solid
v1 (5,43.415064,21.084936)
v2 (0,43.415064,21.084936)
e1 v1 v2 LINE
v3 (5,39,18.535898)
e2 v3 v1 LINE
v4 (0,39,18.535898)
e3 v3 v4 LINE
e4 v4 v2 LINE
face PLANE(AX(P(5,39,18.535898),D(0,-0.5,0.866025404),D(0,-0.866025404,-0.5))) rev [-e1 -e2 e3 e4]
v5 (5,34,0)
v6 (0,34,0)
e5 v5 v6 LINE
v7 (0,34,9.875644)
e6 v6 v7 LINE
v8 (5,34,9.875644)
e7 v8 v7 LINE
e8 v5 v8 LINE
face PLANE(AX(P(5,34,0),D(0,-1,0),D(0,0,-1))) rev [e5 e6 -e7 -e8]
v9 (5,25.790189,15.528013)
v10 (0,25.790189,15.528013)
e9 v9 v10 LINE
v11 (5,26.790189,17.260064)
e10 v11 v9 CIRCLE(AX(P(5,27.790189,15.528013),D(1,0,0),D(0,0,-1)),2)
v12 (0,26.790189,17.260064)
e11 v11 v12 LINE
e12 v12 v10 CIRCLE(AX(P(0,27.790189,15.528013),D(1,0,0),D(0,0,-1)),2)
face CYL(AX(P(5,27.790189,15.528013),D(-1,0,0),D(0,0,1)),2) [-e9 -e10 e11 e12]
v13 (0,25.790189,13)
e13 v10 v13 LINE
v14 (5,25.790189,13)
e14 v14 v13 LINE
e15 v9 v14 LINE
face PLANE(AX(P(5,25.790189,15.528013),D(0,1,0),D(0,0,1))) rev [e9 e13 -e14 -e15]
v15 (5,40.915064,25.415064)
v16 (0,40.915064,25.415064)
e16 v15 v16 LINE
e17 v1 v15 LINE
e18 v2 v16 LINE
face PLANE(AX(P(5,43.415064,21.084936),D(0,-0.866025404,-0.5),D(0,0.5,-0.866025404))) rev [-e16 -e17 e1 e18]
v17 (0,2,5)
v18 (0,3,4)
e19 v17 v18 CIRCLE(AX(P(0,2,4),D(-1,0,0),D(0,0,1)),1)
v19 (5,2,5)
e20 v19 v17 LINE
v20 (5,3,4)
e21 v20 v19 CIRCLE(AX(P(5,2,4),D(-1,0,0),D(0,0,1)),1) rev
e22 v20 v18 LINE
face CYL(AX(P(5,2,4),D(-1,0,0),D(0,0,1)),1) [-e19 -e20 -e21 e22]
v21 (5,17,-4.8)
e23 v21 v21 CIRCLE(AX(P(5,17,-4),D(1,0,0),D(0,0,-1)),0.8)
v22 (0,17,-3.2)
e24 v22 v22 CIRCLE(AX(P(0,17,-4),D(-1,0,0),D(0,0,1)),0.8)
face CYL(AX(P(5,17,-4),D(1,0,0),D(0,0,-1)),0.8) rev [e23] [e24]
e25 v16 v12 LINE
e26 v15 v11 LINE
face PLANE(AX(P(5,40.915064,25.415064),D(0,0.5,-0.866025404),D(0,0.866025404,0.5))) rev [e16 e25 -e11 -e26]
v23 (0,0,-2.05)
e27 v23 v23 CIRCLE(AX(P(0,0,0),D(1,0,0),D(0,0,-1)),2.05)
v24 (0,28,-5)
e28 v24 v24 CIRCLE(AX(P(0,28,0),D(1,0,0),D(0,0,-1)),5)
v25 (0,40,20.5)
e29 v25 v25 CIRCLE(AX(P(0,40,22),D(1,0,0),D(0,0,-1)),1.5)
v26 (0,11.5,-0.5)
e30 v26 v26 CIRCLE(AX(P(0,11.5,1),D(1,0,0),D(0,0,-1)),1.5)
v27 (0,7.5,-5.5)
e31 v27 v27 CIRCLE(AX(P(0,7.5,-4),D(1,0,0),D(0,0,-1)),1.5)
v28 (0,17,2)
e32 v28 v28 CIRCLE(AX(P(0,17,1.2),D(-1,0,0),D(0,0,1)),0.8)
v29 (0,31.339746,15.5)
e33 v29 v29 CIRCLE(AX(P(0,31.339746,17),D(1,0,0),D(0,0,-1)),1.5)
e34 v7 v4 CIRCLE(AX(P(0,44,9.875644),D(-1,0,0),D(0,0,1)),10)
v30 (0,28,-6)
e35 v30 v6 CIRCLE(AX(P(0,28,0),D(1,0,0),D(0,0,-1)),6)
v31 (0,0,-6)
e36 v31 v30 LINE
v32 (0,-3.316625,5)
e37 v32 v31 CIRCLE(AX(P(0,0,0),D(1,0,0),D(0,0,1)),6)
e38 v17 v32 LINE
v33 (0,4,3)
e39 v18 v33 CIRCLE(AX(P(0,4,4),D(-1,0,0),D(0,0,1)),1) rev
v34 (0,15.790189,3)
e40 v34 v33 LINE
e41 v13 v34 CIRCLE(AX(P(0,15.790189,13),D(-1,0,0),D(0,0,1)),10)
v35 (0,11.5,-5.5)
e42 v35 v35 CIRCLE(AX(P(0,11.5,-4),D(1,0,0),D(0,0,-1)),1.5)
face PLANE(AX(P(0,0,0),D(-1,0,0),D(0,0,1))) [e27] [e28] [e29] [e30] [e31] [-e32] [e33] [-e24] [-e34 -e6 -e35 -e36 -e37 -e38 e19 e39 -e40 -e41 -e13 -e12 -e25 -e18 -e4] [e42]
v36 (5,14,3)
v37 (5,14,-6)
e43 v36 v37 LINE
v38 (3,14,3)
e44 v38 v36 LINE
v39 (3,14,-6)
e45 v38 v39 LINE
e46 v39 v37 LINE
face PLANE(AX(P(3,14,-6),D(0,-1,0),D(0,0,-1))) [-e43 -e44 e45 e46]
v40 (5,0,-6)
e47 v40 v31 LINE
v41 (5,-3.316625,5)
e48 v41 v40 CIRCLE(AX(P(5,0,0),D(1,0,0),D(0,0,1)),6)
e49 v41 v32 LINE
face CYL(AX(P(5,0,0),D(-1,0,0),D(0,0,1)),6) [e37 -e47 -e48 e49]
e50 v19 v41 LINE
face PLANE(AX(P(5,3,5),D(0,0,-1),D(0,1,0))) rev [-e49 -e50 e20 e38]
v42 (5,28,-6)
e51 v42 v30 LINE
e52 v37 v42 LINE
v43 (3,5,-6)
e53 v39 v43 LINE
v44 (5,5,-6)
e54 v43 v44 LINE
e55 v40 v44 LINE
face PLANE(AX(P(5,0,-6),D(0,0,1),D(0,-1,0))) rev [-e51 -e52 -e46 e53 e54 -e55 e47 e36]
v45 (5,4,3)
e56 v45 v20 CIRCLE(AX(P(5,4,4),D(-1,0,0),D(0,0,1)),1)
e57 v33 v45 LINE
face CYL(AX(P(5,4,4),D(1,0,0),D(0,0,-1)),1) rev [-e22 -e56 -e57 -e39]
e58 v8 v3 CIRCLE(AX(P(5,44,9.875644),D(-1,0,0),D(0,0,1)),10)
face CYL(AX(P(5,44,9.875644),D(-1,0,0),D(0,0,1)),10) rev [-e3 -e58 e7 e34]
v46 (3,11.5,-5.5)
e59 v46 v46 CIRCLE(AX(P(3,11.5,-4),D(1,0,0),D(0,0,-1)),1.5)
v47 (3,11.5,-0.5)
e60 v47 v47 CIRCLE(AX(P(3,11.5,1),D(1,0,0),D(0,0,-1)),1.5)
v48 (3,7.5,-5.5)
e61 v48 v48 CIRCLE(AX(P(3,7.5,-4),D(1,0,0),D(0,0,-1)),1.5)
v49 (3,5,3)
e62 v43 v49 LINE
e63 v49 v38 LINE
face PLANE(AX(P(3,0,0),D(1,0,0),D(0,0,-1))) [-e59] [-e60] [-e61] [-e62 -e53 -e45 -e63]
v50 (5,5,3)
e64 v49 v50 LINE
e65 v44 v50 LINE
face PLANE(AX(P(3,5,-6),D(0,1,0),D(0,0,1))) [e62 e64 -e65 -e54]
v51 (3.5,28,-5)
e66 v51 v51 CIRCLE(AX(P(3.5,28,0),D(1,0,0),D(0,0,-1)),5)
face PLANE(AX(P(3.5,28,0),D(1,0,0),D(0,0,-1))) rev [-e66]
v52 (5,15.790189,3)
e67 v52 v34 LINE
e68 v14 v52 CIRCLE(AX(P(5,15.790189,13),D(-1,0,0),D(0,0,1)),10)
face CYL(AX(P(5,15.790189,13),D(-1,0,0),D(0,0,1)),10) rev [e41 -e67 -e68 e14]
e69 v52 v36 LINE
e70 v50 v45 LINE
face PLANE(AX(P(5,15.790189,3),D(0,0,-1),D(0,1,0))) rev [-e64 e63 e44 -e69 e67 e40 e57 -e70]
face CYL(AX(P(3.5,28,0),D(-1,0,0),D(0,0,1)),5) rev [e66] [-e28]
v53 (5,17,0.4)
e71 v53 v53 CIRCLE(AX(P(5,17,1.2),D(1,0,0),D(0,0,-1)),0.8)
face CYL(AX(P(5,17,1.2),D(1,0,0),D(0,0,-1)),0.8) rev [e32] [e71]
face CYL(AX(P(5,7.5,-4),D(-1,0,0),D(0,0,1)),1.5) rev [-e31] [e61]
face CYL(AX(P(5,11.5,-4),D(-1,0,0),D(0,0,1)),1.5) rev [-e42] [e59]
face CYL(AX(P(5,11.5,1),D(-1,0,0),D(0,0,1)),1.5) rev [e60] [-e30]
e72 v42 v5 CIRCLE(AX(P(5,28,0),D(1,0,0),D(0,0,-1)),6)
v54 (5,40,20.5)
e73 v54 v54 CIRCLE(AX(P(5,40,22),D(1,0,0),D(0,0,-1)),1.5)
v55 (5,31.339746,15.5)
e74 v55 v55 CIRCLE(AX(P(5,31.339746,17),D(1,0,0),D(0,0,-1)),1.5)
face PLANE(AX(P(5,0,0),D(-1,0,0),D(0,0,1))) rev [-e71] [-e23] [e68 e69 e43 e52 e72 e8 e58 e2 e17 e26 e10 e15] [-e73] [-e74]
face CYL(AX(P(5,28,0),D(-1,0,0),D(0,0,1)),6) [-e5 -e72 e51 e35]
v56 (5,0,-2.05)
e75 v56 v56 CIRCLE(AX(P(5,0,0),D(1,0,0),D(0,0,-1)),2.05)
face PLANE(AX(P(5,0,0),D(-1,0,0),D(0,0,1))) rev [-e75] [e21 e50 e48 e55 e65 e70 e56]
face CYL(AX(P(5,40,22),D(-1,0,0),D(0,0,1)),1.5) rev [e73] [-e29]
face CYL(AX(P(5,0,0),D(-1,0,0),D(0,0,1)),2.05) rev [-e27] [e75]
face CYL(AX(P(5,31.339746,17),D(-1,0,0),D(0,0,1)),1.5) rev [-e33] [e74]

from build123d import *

# Parameters (mm, degrees)
SKETCH1_R                   = 2.05
SKETCH1_R_2                 = 1.5
BOSS_EXTRUDE1_DEPTH         = 5
FILLET1_START               = -1
FILLET1_DEPTH               = 7
FILLET1_2_DEPTH             = 5
TAP_DRILL_FOR_M2X0_4_TAP1_D = 1.6
SKETCH4_W                   = 9
SKETCH4_H                   = 9
CUT_EXTRUDE1_DEPTH          = 2
SKETCH5_R                   = 5
CUT_EXTRUDE2_DEPTH          = 3.5


with BuildPart() as part:
    # Sketch1 → Boss-Extrude1 (new body)
    with BuildSketch(Plane(origin=(0, 0, 0), x_dir=(0, 0, -1), z_dir=(1, 0, 0))):
        with BuildLine():
            Line((6, 0), (6, 28))
            ThreePointArc((6, 28), (4.242640687, 32.242640687), (0, 34))
            Line((0, 34), (-9.875644347, 34))
            ThreePointArc((-9.875644347, 34), (-14.875644347, 35.339745962), (-18.535898385, 39))
            Line((-18.535898385, 39), (-21.084936491, 43.415063509))
            Line((-21.084936491, 43.415063509), (-25.415063509, 40.915063509))
            Line((-25.415063509, 40.915063509), (-17.260063509, 26.790189174))
            ThreePointArc((-17.260063509, 26.790189174), (-16.528012702, 26.058138366), (-15.528012702, 25.790189174))
            Line((-15.528012702, 25.790189174), (-13, 25.790189174))
            ThreePointArc((-13, 25.790189174), (-5.928932188, 22.861256986), (-3, 15.790189174))
            Line((-3, 15.790189174), (-3, 3))
            Line((-3, 3), (-5, 3))
            Line((-5, 3), (-5, -3.31662479))
            ThreePointArc((-5, -3.31662479), (1.732050808, -5.744562647), (6, 0))
        make_face()
        Circle(SKETCH1_R, mode=Mode.SUBTRACT)
        with Locations((-22, 40)):
            Circle(SKETCH1_R_2, mode=Mode.SUBTRACT)
        with Locations((-17, 31.339745962)):
            Circle(SKETCH1_R_2, mode=Mode.SUBTRACT)
        with Locations((-1, 11.5)):
            Circle(SKETCH1_R_2, mode=Mode.SUBTRACT)
        with Locations((4, 11.5)):
            Circle(SKETCH1_R_2, mode=Mode.SUBTRACT)
        with Locations((4, 7.5)):
            Circle(SKETCH1_R_2, mode=Mode.SUBTRACT)
    extrude(amount=BOSS_EXTRUDE1_DEPTH)

    # Fillet1: read off the stored shape, not the designer's step
    # Fillet1 outline → Fillet1 (cut)
    with BuildSketch(Plane.YZ.offset(FILLET1_START)):
        with BuildLine():
            ThreePointArc((2, 5), (2.707106781, 4.707106781), (3, 4))
            Line((3, 4), (3, 5))
            Line((3, 5), (2, 5))
        make_face()
    extrude(amount=FILLET1_DEPTH, mode=Mode.SUBTRACT)

    # Fillet1 2 outline → Fillet1 2 (add)
    with BuildSketch(Plane.YZ):
        with BuildLine():
            ThreePointArc((4, 3), (3.292893219, 3.292893219), (3, 4))
            Line((3, 4), (3, 3))
            Line((3, 3), (4, 3))
        make_face()
    extrude(amount=FILLET1_2_DEPTH)

    # Tap Drill for M2x0.4 Tap1 (through all)
    with Locations(Plane(origin=(5, 0, 0), x_dir=(0, 0, -1), z_dir=(1, 0, 0))):
        with Locations((-1.2, 17), (4, 17)):
            Hole(TAP_DRILL_FOR_M2X0_4_TAP1_D / 2)

    # Sketch4 → Cut-Extrude1 (cut)
    with BuildSketch(Plane.ZY.offset(-5)):
        with Locations((-1.5, 9.5)):
            Rectangle(SKETCH4_W, SKETCH4_H)
    extrude(amount=CUT_EXTRUDE1_DEPTH, mode=Mode.SUBTRACT)

    # Sketch5 → Cut-Extrude2 (cut)
    with BuildSketch(Plane(origin=(0, 0, 0), x_dir=(0, 0, -1), z_dir=(1, 0, 0))):
        with Locations((0, 28)):
            Circle(SKETCH5_R)
    extrude(amount=CUT_EXTRUDE2_DEPTH, mode=Mode.SUBTRACT)


solid = part.part
